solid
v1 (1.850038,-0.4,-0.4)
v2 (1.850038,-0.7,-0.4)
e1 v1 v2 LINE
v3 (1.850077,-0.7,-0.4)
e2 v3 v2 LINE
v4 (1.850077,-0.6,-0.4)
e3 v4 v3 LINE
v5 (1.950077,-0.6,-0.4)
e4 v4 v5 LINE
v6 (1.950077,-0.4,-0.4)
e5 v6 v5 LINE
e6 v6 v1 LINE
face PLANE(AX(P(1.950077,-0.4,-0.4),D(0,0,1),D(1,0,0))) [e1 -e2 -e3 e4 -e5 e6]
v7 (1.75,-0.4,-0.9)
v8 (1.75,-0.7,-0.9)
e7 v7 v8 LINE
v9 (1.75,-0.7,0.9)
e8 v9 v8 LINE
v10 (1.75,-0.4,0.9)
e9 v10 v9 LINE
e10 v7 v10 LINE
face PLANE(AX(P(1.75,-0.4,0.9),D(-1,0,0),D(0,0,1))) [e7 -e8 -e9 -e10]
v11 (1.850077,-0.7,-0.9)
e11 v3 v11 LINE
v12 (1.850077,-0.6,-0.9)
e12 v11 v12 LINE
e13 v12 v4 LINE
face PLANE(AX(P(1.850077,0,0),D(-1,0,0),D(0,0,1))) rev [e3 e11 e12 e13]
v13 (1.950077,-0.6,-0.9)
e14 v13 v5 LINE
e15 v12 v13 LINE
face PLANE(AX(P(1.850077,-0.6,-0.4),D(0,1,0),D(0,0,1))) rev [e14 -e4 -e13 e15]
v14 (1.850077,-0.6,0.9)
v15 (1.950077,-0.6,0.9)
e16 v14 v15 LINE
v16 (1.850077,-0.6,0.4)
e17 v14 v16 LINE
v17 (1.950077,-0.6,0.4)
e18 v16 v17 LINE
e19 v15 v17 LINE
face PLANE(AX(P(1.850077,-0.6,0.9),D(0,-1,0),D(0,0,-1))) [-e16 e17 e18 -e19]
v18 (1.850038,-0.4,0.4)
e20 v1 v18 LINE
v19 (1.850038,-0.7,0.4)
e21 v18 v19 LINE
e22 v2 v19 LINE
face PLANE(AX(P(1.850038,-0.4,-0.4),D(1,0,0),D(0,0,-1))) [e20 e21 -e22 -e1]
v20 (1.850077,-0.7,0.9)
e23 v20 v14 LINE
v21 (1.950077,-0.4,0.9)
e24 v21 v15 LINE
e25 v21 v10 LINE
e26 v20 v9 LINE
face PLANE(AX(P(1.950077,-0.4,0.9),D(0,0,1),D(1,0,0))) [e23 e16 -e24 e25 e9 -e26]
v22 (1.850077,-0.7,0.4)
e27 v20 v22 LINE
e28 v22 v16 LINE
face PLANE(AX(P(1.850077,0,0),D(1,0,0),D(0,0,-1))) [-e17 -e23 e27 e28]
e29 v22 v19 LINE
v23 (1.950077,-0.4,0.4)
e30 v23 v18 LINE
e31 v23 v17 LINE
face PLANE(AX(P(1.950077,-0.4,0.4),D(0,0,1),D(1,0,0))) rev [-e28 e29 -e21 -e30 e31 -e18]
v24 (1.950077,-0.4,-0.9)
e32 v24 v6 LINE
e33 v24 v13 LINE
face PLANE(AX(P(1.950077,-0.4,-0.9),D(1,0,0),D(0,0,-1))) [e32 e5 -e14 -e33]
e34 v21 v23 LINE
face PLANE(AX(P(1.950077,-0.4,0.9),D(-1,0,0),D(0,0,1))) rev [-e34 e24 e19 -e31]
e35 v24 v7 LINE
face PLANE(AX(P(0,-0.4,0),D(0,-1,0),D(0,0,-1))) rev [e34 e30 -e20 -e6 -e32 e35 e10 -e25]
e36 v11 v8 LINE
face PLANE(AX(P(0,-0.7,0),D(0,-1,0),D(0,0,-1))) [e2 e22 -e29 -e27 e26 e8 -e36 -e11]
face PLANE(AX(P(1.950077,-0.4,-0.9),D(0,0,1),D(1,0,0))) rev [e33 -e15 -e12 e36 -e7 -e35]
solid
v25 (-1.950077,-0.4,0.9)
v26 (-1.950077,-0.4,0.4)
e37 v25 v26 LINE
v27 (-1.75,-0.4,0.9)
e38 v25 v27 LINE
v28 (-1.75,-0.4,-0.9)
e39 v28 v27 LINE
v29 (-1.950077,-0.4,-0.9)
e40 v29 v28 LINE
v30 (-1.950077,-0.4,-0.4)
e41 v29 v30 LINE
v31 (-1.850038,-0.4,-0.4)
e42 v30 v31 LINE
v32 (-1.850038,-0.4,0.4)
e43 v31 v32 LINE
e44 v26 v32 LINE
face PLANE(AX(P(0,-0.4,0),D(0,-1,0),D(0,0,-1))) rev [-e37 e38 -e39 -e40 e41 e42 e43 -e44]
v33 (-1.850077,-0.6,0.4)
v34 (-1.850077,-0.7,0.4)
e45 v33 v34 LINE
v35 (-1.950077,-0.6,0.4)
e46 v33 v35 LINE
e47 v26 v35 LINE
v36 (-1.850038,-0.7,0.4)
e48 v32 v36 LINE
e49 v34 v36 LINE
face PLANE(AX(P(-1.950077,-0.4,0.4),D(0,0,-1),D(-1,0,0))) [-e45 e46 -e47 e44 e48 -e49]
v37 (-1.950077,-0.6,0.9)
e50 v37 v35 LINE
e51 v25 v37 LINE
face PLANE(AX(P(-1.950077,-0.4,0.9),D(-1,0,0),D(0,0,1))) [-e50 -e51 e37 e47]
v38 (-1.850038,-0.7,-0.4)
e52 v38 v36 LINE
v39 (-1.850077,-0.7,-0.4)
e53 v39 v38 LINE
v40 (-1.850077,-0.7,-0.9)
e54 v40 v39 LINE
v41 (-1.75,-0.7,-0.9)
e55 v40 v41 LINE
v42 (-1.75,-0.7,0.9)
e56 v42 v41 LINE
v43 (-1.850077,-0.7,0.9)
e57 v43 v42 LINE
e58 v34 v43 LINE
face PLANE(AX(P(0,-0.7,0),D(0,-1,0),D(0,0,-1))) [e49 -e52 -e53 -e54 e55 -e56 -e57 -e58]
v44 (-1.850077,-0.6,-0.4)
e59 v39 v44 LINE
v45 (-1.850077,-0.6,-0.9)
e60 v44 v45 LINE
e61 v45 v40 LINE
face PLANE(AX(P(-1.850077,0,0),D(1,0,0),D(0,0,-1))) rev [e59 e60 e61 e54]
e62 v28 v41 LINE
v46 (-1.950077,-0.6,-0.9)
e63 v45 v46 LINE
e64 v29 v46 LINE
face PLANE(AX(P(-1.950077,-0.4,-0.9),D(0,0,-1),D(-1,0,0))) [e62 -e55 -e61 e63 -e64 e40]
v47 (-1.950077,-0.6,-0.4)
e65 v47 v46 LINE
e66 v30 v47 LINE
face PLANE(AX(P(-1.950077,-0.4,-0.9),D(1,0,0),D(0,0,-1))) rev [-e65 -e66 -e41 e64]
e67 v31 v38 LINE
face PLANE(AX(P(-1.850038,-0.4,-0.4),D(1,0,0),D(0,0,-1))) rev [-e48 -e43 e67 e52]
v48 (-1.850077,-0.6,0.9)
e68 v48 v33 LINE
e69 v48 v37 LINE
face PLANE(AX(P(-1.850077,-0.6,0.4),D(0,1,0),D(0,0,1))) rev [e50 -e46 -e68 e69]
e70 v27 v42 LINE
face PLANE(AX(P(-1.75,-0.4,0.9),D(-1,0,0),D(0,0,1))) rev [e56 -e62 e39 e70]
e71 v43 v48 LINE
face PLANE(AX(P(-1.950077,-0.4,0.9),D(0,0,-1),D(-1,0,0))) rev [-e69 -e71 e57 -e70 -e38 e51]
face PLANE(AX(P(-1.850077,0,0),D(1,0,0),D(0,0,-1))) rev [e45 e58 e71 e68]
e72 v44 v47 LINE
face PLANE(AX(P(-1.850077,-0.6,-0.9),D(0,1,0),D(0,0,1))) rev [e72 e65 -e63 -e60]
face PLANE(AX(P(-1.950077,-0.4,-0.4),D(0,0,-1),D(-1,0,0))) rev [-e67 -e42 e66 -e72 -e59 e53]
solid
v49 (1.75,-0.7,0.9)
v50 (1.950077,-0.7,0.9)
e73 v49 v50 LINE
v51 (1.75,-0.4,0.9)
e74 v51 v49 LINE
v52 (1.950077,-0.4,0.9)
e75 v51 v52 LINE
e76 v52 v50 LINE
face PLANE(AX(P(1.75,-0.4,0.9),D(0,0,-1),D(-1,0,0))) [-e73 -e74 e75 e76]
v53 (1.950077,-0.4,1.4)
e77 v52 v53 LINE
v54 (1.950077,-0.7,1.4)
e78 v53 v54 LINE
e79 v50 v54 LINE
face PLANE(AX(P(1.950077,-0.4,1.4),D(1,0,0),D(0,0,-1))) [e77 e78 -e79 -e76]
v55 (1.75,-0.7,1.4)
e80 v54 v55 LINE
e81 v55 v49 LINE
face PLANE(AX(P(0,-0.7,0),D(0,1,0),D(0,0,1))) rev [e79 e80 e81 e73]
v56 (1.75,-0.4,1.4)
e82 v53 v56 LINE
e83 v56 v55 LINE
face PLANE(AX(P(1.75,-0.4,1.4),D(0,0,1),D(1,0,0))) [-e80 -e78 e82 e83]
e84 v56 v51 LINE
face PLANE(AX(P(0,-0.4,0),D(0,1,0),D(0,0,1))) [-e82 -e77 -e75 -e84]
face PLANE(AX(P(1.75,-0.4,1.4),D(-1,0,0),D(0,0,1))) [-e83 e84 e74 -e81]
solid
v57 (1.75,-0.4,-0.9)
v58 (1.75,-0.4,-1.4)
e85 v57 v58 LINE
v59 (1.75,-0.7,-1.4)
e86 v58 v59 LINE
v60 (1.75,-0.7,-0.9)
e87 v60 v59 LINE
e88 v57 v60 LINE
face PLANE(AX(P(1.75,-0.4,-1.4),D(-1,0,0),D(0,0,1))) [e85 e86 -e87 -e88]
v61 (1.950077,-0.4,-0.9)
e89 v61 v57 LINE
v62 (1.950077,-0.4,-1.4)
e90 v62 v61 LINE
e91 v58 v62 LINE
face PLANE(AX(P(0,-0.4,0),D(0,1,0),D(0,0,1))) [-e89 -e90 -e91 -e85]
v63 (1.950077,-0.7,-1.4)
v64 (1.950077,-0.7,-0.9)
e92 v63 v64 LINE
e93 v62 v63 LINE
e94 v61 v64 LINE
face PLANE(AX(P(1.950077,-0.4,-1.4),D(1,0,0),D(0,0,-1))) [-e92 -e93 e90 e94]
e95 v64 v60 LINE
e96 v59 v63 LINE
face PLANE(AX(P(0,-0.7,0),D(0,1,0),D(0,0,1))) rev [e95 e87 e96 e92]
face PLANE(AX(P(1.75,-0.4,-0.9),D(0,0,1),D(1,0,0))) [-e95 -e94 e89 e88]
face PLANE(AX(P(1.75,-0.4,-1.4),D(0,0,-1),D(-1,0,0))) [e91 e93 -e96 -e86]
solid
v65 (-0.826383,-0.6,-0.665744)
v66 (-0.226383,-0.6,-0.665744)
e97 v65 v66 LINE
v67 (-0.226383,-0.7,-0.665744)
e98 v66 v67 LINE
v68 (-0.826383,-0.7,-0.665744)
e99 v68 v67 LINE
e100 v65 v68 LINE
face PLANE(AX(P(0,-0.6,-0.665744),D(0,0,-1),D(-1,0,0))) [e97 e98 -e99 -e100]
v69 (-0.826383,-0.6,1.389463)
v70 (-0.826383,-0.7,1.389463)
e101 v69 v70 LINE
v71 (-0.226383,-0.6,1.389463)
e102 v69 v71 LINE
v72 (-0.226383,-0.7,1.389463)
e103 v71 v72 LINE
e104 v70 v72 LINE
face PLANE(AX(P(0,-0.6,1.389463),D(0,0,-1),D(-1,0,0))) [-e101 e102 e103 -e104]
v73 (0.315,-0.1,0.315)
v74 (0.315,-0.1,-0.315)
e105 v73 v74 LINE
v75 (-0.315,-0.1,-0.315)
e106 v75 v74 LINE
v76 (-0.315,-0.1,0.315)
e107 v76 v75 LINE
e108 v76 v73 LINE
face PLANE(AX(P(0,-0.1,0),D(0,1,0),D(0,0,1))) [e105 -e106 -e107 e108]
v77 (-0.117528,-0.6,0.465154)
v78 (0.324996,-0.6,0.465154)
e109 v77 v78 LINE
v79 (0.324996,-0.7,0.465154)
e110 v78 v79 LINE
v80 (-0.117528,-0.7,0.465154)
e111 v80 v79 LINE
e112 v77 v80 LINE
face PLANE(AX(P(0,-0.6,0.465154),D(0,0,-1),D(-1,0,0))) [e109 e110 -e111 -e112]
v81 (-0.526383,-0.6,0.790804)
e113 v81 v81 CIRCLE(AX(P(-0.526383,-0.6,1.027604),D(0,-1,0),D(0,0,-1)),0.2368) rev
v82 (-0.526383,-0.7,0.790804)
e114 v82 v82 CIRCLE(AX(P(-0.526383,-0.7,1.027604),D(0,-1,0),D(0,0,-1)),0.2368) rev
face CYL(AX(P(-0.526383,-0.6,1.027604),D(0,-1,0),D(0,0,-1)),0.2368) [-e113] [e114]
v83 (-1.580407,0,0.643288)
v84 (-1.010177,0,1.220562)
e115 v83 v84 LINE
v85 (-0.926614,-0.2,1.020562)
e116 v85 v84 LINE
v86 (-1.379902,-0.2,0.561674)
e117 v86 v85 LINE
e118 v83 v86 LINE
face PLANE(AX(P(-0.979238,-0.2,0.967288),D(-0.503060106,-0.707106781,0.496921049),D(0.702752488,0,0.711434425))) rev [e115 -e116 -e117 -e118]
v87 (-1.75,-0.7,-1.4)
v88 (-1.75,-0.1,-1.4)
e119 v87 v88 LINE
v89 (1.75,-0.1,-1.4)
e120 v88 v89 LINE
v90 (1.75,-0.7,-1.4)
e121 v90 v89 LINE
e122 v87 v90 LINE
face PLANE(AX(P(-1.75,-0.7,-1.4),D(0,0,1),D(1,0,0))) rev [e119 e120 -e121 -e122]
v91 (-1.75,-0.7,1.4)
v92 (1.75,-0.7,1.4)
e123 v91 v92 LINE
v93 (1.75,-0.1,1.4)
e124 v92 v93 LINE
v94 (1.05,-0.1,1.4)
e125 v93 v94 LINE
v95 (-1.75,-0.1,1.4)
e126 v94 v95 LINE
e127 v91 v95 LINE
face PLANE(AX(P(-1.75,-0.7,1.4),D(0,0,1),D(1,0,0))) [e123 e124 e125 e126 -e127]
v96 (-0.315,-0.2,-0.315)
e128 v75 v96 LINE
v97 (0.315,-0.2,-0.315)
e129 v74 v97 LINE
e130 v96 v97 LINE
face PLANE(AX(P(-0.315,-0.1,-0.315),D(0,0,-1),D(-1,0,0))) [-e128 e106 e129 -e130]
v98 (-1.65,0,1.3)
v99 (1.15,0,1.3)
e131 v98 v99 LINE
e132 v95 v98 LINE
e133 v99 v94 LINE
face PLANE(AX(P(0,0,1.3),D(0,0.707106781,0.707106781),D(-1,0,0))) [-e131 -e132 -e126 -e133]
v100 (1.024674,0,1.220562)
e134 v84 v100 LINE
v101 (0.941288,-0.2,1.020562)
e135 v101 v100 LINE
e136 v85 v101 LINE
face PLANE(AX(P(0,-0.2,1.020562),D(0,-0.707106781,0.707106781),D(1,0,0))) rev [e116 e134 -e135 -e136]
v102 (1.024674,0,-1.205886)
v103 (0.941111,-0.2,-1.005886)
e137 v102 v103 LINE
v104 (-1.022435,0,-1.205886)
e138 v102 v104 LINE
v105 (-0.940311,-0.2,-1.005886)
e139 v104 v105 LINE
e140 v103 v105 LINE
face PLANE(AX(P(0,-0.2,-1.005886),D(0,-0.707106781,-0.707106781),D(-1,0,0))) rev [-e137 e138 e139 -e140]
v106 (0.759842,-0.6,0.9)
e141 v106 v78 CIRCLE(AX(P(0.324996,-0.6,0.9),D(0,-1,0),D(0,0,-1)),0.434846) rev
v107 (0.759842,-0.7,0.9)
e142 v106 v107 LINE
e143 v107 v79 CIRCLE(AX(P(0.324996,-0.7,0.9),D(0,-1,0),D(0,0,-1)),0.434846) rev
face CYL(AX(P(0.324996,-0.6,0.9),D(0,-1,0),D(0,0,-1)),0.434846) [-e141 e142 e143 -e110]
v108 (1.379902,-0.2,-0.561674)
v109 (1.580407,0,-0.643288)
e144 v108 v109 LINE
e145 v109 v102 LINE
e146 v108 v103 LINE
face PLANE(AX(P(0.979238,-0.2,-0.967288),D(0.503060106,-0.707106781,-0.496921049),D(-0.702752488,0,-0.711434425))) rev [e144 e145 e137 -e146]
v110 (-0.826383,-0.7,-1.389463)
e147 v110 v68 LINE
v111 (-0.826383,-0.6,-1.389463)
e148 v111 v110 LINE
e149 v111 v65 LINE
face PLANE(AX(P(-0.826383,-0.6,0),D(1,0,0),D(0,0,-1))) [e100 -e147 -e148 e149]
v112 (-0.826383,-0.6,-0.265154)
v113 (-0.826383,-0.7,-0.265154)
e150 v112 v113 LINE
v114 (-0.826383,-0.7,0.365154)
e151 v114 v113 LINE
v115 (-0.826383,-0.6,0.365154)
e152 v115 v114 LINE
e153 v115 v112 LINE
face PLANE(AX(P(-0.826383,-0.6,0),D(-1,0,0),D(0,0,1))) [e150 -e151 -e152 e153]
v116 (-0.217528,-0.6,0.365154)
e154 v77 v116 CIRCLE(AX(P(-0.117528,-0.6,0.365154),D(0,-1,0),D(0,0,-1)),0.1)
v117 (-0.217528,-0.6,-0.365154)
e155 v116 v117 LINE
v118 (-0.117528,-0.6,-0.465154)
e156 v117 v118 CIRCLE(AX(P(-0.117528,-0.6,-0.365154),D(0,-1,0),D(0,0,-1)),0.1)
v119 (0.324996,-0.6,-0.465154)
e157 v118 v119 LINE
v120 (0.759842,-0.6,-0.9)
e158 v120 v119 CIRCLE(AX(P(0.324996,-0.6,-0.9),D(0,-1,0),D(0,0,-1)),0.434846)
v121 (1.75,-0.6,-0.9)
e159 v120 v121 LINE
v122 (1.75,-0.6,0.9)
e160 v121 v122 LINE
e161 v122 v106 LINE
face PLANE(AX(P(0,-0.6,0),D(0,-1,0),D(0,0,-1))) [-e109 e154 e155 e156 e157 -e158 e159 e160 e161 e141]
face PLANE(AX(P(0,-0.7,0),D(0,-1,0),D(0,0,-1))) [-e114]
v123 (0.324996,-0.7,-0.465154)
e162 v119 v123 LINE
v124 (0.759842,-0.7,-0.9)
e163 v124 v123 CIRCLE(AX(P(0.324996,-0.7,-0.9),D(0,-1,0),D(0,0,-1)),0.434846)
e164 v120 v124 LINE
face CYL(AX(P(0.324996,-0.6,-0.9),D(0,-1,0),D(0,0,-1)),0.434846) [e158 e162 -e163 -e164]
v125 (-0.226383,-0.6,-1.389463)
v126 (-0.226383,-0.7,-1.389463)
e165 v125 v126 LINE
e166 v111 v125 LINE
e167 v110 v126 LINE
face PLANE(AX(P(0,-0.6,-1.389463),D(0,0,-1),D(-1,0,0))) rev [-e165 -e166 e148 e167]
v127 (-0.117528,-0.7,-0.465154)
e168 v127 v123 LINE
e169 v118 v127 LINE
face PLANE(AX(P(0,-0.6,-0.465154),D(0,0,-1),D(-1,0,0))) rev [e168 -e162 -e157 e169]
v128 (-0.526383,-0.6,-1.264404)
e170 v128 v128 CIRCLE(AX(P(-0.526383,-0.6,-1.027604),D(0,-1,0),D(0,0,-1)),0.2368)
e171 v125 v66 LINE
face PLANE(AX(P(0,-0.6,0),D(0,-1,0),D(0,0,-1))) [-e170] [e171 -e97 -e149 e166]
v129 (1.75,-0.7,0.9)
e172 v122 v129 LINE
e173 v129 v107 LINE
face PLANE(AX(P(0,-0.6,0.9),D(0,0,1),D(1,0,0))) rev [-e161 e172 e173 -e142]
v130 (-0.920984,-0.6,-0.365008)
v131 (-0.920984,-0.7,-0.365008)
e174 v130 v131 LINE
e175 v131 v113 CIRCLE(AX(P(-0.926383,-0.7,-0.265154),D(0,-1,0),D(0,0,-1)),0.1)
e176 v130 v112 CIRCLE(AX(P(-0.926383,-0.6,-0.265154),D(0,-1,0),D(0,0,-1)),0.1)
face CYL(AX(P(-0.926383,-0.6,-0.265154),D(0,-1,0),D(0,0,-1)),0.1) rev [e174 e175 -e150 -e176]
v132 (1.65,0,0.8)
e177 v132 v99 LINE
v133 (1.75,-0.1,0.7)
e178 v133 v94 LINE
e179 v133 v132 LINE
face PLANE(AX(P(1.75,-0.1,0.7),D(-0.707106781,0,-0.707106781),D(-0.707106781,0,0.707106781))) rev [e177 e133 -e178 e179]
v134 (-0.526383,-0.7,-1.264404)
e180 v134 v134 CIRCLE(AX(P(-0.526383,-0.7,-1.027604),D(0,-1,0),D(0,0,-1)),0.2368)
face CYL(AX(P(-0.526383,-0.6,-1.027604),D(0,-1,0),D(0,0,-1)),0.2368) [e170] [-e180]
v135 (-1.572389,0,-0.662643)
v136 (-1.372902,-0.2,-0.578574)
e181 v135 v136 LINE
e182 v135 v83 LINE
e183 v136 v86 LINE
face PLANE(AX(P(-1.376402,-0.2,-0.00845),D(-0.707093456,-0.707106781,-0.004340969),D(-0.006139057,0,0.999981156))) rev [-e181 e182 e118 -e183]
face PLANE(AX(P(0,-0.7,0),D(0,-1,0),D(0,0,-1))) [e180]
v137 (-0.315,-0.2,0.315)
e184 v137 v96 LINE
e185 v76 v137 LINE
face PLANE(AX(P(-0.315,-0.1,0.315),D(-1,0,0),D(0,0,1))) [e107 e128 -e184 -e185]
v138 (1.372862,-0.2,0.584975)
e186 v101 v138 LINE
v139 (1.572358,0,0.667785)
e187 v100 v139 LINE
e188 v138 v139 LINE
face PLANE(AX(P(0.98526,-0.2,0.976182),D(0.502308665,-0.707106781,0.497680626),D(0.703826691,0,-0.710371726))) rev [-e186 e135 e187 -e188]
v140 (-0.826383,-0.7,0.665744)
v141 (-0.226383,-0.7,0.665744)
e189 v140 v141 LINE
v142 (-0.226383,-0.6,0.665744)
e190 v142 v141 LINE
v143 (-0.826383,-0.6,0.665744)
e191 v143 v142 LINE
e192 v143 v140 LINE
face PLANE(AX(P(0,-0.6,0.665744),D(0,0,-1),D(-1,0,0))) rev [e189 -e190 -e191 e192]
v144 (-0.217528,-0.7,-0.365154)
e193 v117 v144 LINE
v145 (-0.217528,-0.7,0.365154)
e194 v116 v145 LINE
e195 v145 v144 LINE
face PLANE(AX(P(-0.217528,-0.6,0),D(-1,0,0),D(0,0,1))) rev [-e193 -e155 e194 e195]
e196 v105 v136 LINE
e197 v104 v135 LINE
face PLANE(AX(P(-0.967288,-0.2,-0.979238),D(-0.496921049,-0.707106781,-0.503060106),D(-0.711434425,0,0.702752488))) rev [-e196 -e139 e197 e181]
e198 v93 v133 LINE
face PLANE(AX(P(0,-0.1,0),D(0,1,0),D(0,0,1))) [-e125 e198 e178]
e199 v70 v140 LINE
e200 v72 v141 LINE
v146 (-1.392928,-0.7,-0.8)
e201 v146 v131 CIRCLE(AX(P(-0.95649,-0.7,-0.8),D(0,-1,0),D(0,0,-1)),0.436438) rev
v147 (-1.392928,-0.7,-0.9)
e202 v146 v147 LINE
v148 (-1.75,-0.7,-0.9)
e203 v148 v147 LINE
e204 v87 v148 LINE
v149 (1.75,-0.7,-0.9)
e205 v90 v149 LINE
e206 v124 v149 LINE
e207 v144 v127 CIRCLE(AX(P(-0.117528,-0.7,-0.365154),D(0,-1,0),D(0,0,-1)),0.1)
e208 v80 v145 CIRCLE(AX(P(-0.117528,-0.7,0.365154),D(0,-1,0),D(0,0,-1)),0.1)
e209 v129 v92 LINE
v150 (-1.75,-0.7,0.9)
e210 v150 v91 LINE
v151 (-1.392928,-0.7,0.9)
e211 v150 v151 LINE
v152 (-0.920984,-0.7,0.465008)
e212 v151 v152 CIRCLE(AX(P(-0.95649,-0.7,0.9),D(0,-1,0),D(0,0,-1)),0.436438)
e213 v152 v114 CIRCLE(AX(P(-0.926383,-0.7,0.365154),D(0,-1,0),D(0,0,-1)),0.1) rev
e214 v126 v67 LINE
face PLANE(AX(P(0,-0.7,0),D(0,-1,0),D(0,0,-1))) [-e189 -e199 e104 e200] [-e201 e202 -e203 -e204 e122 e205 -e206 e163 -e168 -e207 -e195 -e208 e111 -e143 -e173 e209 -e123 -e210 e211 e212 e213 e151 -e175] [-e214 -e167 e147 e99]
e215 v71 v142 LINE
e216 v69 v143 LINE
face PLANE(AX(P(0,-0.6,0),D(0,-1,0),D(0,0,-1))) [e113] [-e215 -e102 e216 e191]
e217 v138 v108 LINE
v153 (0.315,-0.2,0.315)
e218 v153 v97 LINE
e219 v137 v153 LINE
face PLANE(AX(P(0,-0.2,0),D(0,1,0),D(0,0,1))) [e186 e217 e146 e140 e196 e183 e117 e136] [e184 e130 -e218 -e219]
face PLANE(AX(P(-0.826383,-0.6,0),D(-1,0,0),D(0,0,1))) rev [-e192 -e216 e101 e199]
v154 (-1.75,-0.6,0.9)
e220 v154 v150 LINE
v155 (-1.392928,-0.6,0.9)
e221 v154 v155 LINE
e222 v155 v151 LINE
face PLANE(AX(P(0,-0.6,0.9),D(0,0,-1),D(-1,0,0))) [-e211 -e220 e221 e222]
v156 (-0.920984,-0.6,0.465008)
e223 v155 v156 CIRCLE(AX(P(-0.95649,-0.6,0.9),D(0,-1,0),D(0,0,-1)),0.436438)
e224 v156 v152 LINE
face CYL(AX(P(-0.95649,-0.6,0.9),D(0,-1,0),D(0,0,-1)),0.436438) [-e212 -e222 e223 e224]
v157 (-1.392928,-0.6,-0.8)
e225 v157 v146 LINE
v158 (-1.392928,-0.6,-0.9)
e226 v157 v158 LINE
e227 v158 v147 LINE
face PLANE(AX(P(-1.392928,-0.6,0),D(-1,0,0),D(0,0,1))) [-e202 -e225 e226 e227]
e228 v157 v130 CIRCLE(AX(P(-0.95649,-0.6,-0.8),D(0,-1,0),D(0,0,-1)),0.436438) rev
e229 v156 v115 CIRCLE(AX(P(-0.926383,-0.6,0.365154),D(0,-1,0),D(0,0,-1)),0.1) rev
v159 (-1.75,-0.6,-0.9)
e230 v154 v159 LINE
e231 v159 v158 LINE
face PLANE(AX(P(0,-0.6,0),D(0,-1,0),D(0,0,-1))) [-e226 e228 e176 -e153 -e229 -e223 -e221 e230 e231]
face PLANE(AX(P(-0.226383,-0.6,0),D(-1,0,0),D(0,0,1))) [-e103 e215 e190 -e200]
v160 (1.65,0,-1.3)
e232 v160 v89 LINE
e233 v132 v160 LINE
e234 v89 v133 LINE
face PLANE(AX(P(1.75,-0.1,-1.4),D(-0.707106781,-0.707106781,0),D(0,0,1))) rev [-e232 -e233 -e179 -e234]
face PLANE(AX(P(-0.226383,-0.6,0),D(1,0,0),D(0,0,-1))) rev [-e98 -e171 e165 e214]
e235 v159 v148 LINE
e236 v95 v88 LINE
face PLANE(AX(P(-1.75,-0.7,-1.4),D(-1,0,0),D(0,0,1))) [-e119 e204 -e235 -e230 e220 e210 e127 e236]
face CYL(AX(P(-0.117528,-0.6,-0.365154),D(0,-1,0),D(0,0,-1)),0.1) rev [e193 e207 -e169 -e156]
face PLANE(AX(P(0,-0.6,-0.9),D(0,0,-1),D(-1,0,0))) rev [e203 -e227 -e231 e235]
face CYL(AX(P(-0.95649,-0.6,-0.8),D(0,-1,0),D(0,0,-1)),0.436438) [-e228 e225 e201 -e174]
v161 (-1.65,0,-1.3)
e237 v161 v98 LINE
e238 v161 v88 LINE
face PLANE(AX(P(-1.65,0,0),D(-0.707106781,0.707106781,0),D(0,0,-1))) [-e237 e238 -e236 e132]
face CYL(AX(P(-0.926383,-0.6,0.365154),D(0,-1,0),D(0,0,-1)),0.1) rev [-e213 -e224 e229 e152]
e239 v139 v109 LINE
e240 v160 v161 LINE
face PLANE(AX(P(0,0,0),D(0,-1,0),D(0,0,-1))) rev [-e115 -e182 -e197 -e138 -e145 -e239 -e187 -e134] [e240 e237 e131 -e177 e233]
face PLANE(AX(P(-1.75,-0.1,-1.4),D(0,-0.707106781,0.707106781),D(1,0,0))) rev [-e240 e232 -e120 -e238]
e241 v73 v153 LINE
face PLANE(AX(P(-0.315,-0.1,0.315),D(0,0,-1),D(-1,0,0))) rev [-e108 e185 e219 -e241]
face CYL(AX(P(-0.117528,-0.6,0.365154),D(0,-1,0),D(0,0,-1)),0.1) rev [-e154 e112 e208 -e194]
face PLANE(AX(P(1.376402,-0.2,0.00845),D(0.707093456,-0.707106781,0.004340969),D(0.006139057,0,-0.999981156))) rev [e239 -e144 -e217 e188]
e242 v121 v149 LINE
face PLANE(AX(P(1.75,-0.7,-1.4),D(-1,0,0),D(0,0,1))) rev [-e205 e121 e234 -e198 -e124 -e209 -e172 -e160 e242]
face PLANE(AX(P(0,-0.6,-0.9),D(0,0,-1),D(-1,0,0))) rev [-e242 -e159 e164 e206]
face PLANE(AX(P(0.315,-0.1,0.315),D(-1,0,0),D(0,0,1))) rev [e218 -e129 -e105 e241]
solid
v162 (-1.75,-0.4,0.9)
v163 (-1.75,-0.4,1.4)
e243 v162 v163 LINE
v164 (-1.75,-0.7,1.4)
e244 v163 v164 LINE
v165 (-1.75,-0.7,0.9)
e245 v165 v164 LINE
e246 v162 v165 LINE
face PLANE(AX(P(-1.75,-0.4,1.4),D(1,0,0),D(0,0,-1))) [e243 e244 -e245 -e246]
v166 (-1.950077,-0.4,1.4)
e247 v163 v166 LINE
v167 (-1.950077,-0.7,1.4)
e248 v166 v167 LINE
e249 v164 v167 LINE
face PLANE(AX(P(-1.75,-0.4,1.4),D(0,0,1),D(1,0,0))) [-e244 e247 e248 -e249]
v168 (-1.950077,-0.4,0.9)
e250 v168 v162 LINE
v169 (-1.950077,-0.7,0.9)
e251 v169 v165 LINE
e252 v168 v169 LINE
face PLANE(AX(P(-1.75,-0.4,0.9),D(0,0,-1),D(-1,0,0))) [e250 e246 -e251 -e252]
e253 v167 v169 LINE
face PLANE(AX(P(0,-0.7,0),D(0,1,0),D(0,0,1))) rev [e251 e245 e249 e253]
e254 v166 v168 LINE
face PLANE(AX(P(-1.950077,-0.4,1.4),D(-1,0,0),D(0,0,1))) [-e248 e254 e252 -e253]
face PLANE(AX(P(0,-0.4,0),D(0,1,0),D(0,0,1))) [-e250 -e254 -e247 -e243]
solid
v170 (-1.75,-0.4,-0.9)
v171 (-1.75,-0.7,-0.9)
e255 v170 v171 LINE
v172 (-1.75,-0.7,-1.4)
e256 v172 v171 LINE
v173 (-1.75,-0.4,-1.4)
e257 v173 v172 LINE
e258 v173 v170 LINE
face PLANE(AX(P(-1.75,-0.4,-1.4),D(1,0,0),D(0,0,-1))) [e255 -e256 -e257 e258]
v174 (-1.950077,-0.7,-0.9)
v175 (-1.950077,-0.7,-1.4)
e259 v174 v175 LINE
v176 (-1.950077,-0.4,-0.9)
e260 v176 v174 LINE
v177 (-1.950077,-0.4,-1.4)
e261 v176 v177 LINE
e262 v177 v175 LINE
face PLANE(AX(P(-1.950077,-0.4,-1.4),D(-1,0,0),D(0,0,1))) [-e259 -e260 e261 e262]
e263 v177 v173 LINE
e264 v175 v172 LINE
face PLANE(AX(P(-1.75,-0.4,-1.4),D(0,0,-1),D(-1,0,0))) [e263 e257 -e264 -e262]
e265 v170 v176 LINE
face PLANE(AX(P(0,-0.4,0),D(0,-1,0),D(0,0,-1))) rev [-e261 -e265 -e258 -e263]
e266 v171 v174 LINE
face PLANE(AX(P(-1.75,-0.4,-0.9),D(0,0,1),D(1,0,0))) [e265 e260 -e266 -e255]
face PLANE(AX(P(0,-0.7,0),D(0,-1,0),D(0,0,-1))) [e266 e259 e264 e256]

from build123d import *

# Parameters (mm, degrees)
SKETCH8_W             = 3.5
SKETCH8_H             = 2.8
BOSS_EXTRUDE3_DEPTH   = 0.7
CUT_EXTRUDE2_DEPTH    = 0.2
CHAMFER1_SIZE         = 0.1
CUT_EXTRUDE3_DEPTH    = 0.1
SKETCH12_W            = 0.200076611
SKETCH12_H            = 0.5
BOSS_EXTRUDE4_DEPTH   = 0.3
BOSS_EXTRUDE4_2_DEPTH = 0.3
BOSS_EXTRUDE4_3_DEPTH = 0.3
BOSS_EXTRUDE4_4_DEPTH = 0.3
BOSS_EXTRUDE8_DEPTH   = 0.3
BOSS_EXTRUDE8_2_DEPTH = 0.3
SKETCH15_W            = 0.6
SKETCH15_H            = 0.723719119
SKETCH15_R            = 0.236799963
CUT_EXTRUDE12_DEPTH   = 0.1
CHAMFER5_SIZE         = 0.2
SKETCH25_W            = 0.63
SKETCH25_H            = 0.63
BOSS_EXTRUDE13_DEPTH  = 0.1
SKETCH27_W            = 0.5
SKETCH27_H            = 0.1
CUT_EXTRUDE25_DEPTH   = 0.1
SKETCH30_W            = 0.5
SKETCH30_H            = 0.1
CUT_EXTRUDE26_DEPTH   = 0.1
SKETCH31_W            = 0.5
SKETCH31_H            = 0.1
CUT_EXTRUDE27_DEPTH   = 0.1
SKETCH32_W            = 0.5
SKETCH32_H            = 0.1
CUT_EXTRUDE28_DEPTH   = 0.1


with BuildPart() as part:
    # Sketch8 → Boss-Extrude3 (new body)
    with BuildSketch(Plane(origin=(0, 0, 0), x_dir=(1, 0, 0), z_dir=(0, 1, 0))):
        Rectangle(SKETCH8_W, SKETCH8_H)
    extrude(amount=-BOSS_EXTRUDE3_DEPTH)

    # Sketch9 → Cut-Extrude2 (cut)
    with BuildSketch(Plane(origin=(0, 0, 0), x_dir=(1, 0, 0), z_dir=(0, 1, 0))):
        Polygon((-1.022435057, 1.205886324), (-1.572389449, 0.66264326), (-1.580406785, -0.6432877), (-1.010176789, -1.220562425), (1.024673791, -1.220562425), (1.572357881, -0.667785303), (1.580406785, 0.6432877), (1.024673791, 1.205886324), align=None)
    extrude(amount=-CUT_EXTRUDE2_DEPTH, mode=Mode.SUBTRACT)

    # Chamfer1
    chamfer1_edges = [part.edges().sort_by_distance(p)[0] for p in [
        (-1.75, 0, 0),
        (0, 0, -1.4),
        (1.75, 0, 0),
        (0, 0, 1.4),
    ]]
    chamfer(chamfer1_edges, length=CHAMFER1_SIZE)

    # Sketch10 → Cut-Extrude3 (cut)
    with BuildSketch(Plane(origin=(0, 0, 0), x_dir=(1, 0, 0), z_dir=(0, 1, 0))):
        Polygon((1.75, -0.7), (1.05, -1.4), (1.75, -1.4), align=None)
    extrude(amount=-CUT_EXTRUDE3_DEPTH, mode=Mode.SUBTRACT)

    # Sketch15 → Cut-Extrude12 (cut)
    # profile 1 of 4: a face of its own
    with BuildSketch(Plane.XZ.offset(0.7)):
        with BuildLine():
            Line((1.75, -0.9), (1.75, 0.9))
            Line((1.75, 0.9), (0.759841575, 0.9))
            ThreePointArc((0.759841575, 0.9), (0.632478155, 0.592517505), (0.32499566, 0.465154085))
            Line((0.32499566, 0.465154085), (-0.117527877, 0.465154085))
            ThreePointArc((-0.117527877, 0.465154085), (-0.188238555, 0.435864763), (-0.217527877, 0.365154085))
            Line((-0.217527877, 0.365154085), (-0.217527877, -0.365154085))
            ThreePointArc((-0.217527877, -0.365154085), (-0.188238555, -0.435864763), (-0.117527877, -0.465154085))
            Line((-0.117527877, -0.465154085), (0.32499566, -0.465154085))
            ThreePointArc((0.32499566, -0.465154085), (0.632478155, -0.592517505), (0.759841575, -0.9))
            Line((0.759841575, -0.9), (1.75, -0.9))
        make_face()
    # profile 2 of 4: a face of its own
    with BuildSketch(Plane.XZ.offset(0.7)):
        with BuildLine():
            Line((-1.392928117, 0.9), (-1.75, 0.9))
            Line((-1.75, 0.9), (-1.75, -0.9))
            Line((-1.75, -0.9), (-1.392928117, -0.9))
            Line((-1.392928117, -0.9), (-1.392928117, -0.8))
            ThreePointArc((-1.392928117, -0.8), (-1.252278886, -0.479083743), (-0.920984108, -0.365008244))
            ThreePointArc((-0.920984108, -0.365008244), (-0.853788556, -0.333929517), (-0.826382909, -0.265154085))
            Line((-0.826382909, -0.265154085), (-0.826382909, 0.365154085))
            ThreePointArc((-0.826382909, 0.365154085), (-0.853788556, 0.433929517), (-0.920984108, 0.465008244))
            ThreePointArc((-0.920984108, 0.465008244), (-1.252278886, 0.579083743), (-1.392928117, 0.9))
        make_face()
    # profile 3 of 4: a face of its own
    with BuildSketch(Plane.XZ.offset(0.7)):
        with Locations((-0.526382909, -1.027603704)):
            Rectangle(SKETCH15_W, SKETCH15_H)
        with Locations(Location((-0.526382909, -1.027603704, 0), (0, 0, 270))):
            Circle(SKETCH15_R, mode=Mode.SUBTRACT)
    # profile 4 of 4: a face of its own
    with BuildSketch(Plane.XZ.offset(0.7)):
        with Locations((-0.526382909, 1.027603704)):
            Rectangle(SKETCH15_W, SKETCH15_H)
        with Locations(Location((-0.526382909, 1.027603704, 0), (0, 0, 270))):
            Circle(SKETCH15_R, mode=Mode.SUBTRACT)
    extrude(amount=-CUT_EXTRUDE12_DEPTH, mode=Mode.SUBTRACT)

    # Chamfer5
    chamfer5_edges = [part.edges().sort_by_distance(p)[0] for p in [
        (1.302540288, -0.2, -0.924587012),
        (1.576382333, -0.2, 0.012248802),
        (1.298515836, -0.2, 0.944173864),
        (0.007248501, -0.2, 1.220562425),
        (-1.295291787, -0.2, 0.931925062),
        (-1.576398117, -0.2, -0.00967778),
        (-1.297412253, -0.2, -0.934264792),
        (0.001119367, -0.2, -1.205886324),
    ]]
    chamfer(chamfer5_edges, length=CHAMFER5_SIZE - 0.0001)  # a hair under: the kernel refuses the full size

    # Sketch25 → Boss-Extrude13 (add)
    with BuildSketch(Plane(origin=(0, -0.2, 0), x_dir=(1, 0, 0), z_dir=(0, 1, 0))):
        Rectangle(SKETCH25_W, SKETCH25_H)
    extrude(amount=BOSS_EXTRUDE13_DEPTH)


with BuildPart() as body_2:
    # Sketch12 → Boss-Extrude4 (new body)
    with BuildSketch(Plane.XZ.offset(0.7)):
        with Locations((-1.850038306, -1.15)):
            Rectangle(SKETCH12_W, SKETCH12_H)
    extrude(amount=-BOSS_EXTRUDE4_DEPTH)


with BuildPart() as body_3:
    # Sketch12 → Boss-Extrude4 2 (new body)
    with BuildSketch(Plane.XZ.offset(0.7)):
        with Locations((-1.850038306, 1.15)):
            Rectangle(SKETCH12_W, SKETCH12_H)
    extrude(amount=-BOSS_EXTRUDE4_2_DEPTH)


with BuildPart() as body_4:
    # Sketch12 → Boss-Extrude4 3 (new body)
    with BuildSketch(Plane.XZ.offset(0.7)):
        with Locations((1.850038306, 1.15)):
            Rectangle(SKETCH12_W, SKETCH12_H)
    extrude(amount=-BOSS_EXTRUDE4_3_DEPTH)


with BuildPart() as body_5:
    # Sketch12 → Boss-Extrude4 4 (new body)
    with BuildSketch(Plane.XZ.offset(0.7)):
        with Locations((1.850038306, -1.15)):
            Rectangle(SKETCH12_W, SKETCH12_H)
    extrude(amount=-BOSS_EXTRUDE4_4_DEPTH)


with BuildPart() as body_6:
    # Sketch13 → Boss-Extrude8 (new body)
    with BuildSketch(Plane.XZ.offset(0.7)):
        Polygon((1.950076611, 0.9), (1.75, 0.9), (1.75, 0.4), (1.75, -0.4), (1.75, -0.9), (1.950076611, -0.9), (1.950076611, -0.4), (1.850038305, -0.4), (1.850038305, 0.4), (1.950076611, 0.4), align=None)
    extrude(amount=-BOSS_EXTRUDE8_DEPTH)

    # Sketch27 → Cut-Extrude25 (cut)
    with BuildSketch(Plane(origin=(1.950076611, 0, 0), x_dir=(0, 0, -1), z_dir=(1, 0, 0))):
        with Locations((0.65, -0.65)):
            Rectangle(SKETCH27_W, SKETCH27_H)
    extrude(amount=-CUT_EXTRUDE25_DEPTH, mode=Mode.SUBTRACT)

    # Sketch30 → Cut-Extrude26 (cut)
    with BuildSketch(Plane(origin=(1.950076611, 0, 0), x_dir=(0, 0, -1), z_dir=(1, 0, 0))):
        with Locations((-0.65, -0.65)):
            Rectangle(SKETCH30_W, SKETCH30_H)
    extrude(amount=-CUT_EXTRUDE26_DEPTH, mode=Mode.SUBTRACT)


with BuildPart() as body_7:
    # Sketch13 → Boss-Extrude8 2 (new body)
    with BuildSketch(Plane.XZ.offset(0.7)):
        Polygon((-1.75, -0.9), (-1.75, -0.4), (-1.75, 0.4), (-1.75, 0.9), (-1.950076611, 0.9), (-1.950076611, 0.4), (-1.850038305, 0.4), (-1.850038305, -0.4), (-1.950076611, -0.4), (-1.950076611, -0.9), align=None)
    extrude(amount=-BOSS_EXTRUDE8_2_DEPTH)

    # Sketch31 → Cut-Extrude27 (cut)
    with BuildSketch(Plane.ZY.offset(1.950076611)):
        with Locations((-0.65, -0.65)):
            Rectangle(SKETCH31_W, SKETCH31_H)
    extrude(amount=-CUT_EXTRUDE27_DEPTH, mode=Mode.SUBTRACT)

    # Sketch32 → Cut-Extrude28 (cut)
    with BuildSketch(Plane.ZY.offset(1.950076611)):
        with Locations((0.65, -0.65)):
            Rectangle(SKETCH32_W, SKETCH32_H)
    extrude(amount=-CUT_EXTRUDE28_DEPTH, mode=Mode.SUBTRACT)


solid = Compound([part.part, body_2.part, body_3.part, body_4.part, body_5.part, body_6.part, body_7.part])
